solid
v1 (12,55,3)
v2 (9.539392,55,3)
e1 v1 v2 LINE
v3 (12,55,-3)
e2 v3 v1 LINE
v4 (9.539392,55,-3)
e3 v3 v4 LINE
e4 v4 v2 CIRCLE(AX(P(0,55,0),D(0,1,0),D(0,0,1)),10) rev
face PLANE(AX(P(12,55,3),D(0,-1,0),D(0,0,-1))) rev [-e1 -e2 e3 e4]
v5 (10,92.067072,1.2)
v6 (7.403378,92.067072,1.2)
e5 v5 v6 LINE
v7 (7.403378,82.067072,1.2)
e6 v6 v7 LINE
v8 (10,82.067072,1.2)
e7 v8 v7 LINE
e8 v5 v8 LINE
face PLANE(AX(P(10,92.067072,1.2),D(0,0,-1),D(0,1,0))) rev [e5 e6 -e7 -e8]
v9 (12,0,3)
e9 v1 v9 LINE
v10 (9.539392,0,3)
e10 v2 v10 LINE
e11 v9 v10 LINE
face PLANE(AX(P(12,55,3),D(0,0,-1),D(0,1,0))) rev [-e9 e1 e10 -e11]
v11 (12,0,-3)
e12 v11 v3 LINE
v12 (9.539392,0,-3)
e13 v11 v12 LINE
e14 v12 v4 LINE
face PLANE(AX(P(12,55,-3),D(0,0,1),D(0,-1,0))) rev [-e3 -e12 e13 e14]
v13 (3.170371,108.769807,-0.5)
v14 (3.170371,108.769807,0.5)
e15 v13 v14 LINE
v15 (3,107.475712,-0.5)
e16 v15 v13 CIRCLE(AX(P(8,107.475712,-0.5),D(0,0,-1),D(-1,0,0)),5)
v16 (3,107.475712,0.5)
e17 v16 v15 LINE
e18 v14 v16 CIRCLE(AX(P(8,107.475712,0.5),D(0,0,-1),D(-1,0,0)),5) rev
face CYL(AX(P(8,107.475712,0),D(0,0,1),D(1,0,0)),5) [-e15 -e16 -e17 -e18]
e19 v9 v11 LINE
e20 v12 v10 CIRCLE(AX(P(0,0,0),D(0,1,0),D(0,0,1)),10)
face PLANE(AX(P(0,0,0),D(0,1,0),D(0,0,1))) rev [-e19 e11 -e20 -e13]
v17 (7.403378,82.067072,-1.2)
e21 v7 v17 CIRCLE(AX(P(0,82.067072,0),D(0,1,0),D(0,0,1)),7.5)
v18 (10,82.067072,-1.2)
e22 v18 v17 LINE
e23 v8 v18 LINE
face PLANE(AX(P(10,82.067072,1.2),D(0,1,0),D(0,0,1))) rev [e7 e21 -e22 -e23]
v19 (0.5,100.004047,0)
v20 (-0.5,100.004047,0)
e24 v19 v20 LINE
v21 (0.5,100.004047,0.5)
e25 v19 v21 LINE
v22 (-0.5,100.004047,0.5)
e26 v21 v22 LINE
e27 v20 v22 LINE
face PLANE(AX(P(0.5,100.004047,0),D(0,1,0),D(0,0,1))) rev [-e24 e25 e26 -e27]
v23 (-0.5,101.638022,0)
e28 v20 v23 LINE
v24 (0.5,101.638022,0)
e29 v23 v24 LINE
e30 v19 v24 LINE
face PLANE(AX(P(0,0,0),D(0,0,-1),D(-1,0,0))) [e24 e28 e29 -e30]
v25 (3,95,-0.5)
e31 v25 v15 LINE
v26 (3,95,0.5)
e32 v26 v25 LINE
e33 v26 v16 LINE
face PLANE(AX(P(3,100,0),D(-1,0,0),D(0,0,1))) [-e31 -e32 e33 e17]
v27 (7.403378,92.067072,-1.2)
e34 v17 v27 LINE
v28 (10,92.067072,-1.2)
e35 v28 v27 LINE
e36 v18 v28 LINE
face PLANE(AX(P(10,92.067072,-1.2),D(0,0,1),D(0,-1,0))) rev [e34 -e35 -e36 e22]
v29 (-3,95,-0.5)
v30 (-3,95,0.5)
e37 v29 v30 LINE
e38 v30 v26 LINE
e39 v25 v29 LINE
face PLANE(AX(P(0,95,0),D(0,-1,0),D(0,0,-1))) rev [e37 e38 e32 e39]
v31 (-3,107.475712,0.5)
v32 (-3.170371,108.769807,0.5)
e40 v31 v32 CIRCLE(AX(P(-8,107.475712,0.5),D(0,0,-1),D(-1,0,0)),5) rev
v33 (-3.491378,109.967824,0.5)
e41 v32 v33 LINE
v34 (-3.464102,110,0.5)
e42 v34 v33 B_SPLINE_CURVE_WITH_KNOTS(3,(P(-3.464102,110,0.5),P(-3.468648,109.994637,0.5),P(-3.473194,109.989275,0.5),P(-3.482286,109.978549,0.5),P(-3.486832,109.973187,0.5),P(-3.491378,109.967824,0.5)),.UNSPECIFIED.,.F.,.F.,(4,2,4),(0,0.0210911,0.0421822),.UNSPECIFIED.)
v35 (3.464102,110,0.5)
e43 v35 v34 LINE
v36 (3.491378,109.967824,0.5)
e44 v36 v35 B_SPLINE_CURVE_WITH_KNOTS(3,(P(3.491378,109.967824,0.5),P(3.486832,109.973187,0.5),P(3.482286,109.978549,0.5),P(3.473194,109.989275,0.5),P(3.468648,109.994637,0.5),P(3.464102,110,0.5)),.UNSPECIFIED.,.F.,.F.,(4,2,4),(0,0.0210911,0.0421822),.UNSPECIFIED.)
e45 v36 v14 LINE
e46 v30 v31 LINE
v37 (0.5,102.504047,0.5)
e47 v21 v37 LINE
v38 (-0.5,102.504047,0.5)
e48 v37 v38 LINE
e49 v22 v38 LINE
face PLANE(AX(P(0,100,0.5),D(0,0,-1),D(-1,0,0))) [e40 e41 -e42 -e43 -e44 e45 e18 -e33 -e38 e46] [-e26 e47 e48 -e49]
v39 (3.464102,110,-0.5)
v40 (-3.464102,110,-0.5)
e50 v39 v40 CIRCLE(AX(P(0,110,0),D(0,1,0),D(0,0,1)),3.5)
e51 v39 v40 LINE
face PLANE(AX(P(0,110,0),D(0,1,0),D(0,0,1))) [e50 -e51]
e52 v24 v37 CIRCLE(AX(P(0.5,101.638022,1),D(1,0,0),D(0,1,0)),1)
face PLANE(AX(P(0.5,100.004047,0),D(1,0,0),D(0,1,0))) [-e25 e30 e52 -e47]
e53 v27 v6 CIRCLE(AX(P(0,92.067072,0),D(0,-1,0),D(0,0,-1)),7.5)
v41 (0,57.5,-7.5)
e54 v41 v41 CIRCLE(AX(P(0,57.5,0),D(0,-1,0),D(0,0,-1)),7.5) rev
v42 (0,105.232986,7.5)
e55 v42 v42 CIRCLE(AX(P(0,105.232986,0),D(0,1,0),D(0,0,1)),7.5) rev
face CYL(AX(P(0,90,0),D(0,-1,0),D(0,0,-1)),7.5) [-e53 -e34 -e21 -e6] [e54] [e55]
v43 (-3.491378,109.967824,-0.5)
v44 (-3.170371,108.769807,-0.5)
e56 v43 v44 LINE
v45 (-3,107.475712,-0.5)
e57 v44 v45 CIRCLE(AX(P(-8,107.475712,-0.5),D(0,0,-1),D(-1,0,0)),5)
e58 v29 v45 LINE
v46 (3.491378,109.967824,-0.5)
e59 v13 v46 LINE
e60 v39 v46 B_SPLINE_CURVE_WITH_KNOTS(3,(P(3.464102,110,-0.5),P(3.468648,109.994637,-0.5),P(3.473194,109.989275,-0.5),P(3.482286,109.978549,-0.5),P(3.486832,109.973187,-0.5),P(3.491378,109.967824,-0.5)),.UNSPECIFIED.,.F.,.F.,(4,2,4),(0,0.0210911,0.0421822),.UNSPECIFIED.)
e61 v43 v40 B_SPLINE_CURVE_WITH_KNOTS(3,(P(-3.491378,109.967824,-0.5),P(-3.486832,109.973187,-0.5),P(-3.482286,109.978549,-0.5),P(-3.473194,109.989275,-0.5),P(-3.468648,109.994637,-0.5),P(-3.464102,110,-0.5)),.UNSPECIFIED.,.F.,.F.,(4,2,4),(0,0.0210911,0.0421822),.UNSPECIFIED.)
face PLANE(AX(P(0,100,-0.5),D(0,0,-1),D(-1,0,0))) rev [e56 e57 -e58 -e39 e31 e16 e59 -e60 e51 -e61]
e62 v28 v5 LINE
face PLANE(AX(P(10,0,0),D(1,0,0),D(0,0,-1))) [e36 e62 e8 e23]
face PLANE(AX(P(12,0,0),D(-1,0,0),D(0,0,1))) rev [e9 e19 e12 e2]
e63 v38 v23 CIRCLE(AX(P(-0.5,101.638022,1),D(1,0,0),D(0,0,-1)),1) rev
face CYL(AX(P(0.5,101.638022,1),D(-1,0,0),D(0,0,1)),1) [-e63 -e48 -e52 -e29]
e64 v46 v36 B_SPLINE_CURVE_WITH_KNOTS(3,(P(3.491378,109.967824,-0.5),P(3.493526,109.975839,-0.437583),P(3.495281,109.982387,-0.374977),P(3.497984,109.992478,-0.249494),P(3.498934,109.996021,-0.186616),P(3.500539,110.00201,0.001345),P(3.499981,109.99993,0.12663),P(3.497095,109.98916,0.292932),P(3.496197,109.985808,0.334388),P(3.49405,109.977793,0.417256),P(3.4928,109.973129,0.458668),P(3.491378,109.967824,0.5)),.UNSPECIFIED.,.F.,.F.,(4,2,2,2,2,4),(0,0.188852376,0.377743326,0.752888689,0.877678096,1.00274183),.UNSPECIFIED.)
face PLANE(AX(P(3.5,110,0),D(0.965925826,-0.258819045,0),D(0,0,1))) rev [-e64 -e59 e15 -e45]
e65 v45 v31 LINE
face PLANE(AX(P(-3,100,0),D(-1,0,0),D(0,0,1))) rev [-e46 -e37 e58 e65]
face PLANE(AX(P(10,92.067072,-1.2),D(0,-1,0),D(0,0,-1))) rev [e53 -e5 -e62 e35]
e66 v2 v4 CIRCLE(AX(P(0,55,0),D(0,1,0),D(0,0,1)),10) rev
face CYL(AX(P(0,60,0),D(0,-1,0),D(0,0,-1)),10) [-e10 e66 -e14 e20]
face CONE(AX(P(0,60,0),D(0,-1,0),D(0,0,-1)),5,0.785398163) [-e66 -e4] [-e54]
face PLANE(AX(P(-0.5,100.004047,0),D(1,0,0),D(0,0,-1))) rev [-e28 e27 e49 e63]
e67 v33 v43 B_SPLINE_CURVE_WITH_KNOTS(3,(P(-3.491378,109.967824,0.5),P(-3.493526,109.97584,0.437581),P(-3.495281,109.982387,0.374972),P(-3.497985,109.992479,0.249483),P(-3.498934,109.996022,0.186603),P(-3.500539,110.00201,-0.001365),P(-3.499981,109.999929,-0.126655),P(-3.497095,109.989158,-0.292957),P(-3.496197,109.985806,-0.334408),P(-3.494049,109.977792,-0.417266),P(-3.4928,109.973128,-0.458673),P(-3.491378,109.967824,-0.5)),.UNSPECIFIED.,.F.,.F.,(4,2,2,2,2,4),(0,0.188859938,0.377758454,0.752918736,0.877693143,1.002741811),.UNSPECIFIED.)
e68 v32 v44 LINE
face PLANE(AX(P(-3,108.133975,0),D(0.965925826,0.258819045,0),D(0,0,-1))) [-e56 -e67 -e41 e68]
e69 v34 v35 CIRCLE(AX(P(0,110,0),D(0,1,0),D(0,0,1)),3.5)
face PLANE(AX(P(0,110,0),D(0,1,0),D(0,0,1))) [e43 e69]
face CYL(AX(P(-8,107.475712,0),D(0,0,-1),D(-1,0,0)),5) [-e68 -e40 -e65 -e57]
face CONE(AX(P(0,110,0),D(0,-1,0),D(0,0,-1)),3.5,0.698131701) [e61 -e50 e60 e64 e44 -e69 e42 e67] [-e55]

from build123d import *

# Parameters (mm, degrees)
SKETCH1_R           = 10
BOSS_EXTRUDE1_DEPTH = 60
SKETCH2_R           = 7.5
BOSS_EXTRUDE2_DEPTH = 30
CHAMFER2_SIZE       = 5
SKETCH3_R           = 7.5
BOSS_EXTRUDE3_DEPTH = 20
CHAMFER3_SIZE       = 4
CHAMFER3_SIZE2      = 4.76701437
SKETCH5_W           = 6
SKETCH5_H           = 55
BOSS_EXTRUDE5_DEPTH = 12
SKETCH6_W           = 2.4
SKETCH6_H           = 10
BOSS_EXTRUDE6_DEPTH = 10
SKETCH13_W          = 6
SKETCH13_H          = 1
CUT_EXTRUDE2_DEPTH  = 10
SKETCH14_W          = 6
SKETCH14_H          = 1
CUT_EXTRUDE3_DEPTH  = 5
CHAMFER22_SIZE      = 0.5
CHAMFER22_SIZE_2    = 1.866025404
SKETCH17_W          = 1
SKETCH17_H          = 2.5
BOSS_EXTRUDE7_DEPTH = 0.5
FILLET1_R           = 1
FILLET2_R           = 5


with BuildPart() as part:
    # Sketch1 → Boss-Extrude1 (new body)
    with BuildSketch(Plane(origin=(0, 0, 0), x_dir=(1, 0, 0), z_dir=(0, 1, 0))):
        with Locations(Location((0, 0, 0), (0, 0, 90))):
            Circle(SKETCH1_R)
    extrude(amount=BOSS_EXTRUDE1_DEPTH)

    # Sketch2 → Boss-Extrude2 (add)
    with BuildSketch(Plane(origin=(0, 60, 0), x_dir=(1, 0, 0), z_dir=(0, 1, 0))):
        with Locations(Location((0, 0, 0), (0, 0, 270))):
            Circle(SKETCH2_R)
    extrude(amount=BOSS_EXTRUDE2_DEPTH)

    # Chamfer2
    # the kernel refuses this chamfer: 5 mm, written as the material it takes off along each edge
    with BuildSketch(Plane(origin=(0, 60, 0), x_dir=(0, 0, -1), z_dir=(1, 0, 0))) as chamfer2_piece_1_section:
        Polygon((10, -CHAMFER2_SIZE), (10 - CHAMFER2_SIZE, 0), (10, 0), align=None)
    chamfer2_piece_1 = revolve(axis=Axis((0, 60, 0), (0, 1, 0)), mode=Mode.PRIVATE)
    chamfer2_piece_1 = chamfer2_piece_1 - Plane(origin=(0, 56.238108378, 0), x_dir=(0, 0, 1), z_dir=(0, -1, 0)) * Cylinder(7.5, 40, mode=Mode.PRIVATE)
    add(chamfer2_piece_1, mode=Mode.SUBTRACT)

    # Sketch3 → Boss-Extrude3 (add)
    with BuildSketch(Plane(origin=(0, 90, 0), x_dir=(1, 0, 0), z_dir=(0, 1, 0))):
        with Locations(Location((0, 0, 0), (0, 0, 90))):
            Circle(SKETCH3_R)
    extrude(amount=BOSS_EXTRUDE3_DEPTH)

    # Chamfer3
    chamfer3_edges = [part.edges().sort_by_distance(p)[0] for p in [
        (0, 110, 7.5),
    ]]
    chamfer3_side = [part.faces().sort_by_distance(p)[0] for p in [
        (0, 110, 0),
    ]]
    chamfer(chamfer3_edges, length=CHAMFER3_SIZE, length2=CHAMFER3_SIZE2, reference=chamfer3_side[0])

    # Sketch5 → Boss-Extrude5 (add)
    with BuildSketch(Plane(origin=(0, 0, 0), x_dir=(0, 0, -1), z_dir=(1, 0, 0))):
        with Locations((0, 27.5)):
            Rectangle(SKETCH5_W, SKETCH5_H)
    extrude(amount=BOSS_EXTRUDE5_DEPTH)

    # Sketch6 → Boss-Extrude6 (add)
    with BuildSketch(Plane(origin=(0, 0, 0), x_dir=(0, 0, -1), z_dir=(1, 0, 0))):
        with Locations((0, 87.067071975)):
            Rectangle(SKETCH6_W, SKETCH6_H)
    extrude(amount=BOSS_EXTRUDE6_DEPTH)

    # Sketch13 → Cut-Extrude2 (cut)
    with BuildSketch(Plane(origin=(0, 110, 0), x_dir=(1, 0, 0), z_dir=(0, 1, 0))):
        Rectangle(SKETCH13_W, SKETCH13_H)
    extrude(amount=-CUT_EXTRUDE2_DEPTH, mode=Mode.SUBTRACT)

    # Sketch14 → Cut-Extrude3 (cut)
    with BuildSketch(Plane(origin=(0, 100, 0), x_dir=(1, 0, 0), z_dir=(0, 1, 0))):
        Rectangle(SKETCH14_W, SKETCH14_H)
    extrude(amount=-CUT_EXTRUDE3_DEPTH, mode=Mode.SUBTRACT)

    # Chamfer22
    # the kernel refuses this chamfer: 1.866025404, 0.5 mm, written as the material it takes off along each edge
    with BuildSketch(Plane(origin=(3, 110, 0.5), x_dir=(0.9905000388259552, 0.13751244702128432, 0), z_dir=(0, 0, -1)), Plane(origin=(-3, 110, -0.5), x_dir=(-0.9905000388259552, 0.13751244702128432, 0), z_dir=(0, 0, 1))) as chamfer22_piece_1:
        Polygon((CHAMFER22_SIZE * 0.990500038826, CHAMFER22_SIZE * 0.137512447021), (-CHAMFER22_SIZE_2 * 0.137512447005, CHAMFER22_SIZE_2 * 0.990500038712), (0, 0), align=None)
    extrude(amount=1, mode=Mode.SUBTRACT)

    # Sketch17 → Boss-Extrude7 (add)
    with BuildSketch(Plane(origin=(0, 0, 0.5), x_dir=(-1, 0, 0), z_dir=(0, 0, -1))):
        with Locations((0, 101.254046964)):
            Rectangle(SKETCH17_W, SKETCH17_H)
    extrude(amount=BOSS_EXTRUDE7_DEPTH)

    # Fillet1
    # the kernel refuses this fillet: 1 mm, written as the material it takes off along each edge
    with BuildSketch(Plane(origin=(-2.665063509, 102.504046964, 0), x_dir=(0, 0, 1), z_dir=(1, 0, 0))) as fillet1_piece_1:
        with BuildLine():
            CenterArc((1, 0.866025404), FILLET1_R, 180, 60)
            Line((0, 0.866025404), (-0.02, 0.866025404))
            Line((-0.02, 0.866025404), (-0.02, 0))
            Line((-0.02, 0), (0, -0.02))
            ThreePointArc((0, -0.02), (0.25, -0.02), (0.49, -0.017320508))
            Line((0.49, -0.017320508), (0.5, 0))
        make_face()
    extrude(amount=5.330127019, mode=Mode.SUBTRACT)

    # Fillet2
    fillet2_edges = [part.edges().sort_by_distance(p)[0] for p in [
        (3, 108.133974596, 0),
        (-3, 108.133974596, 0),
    ]]
    fillet(fillet2_edges, radius=FILLET2_R)


solid = part.part
